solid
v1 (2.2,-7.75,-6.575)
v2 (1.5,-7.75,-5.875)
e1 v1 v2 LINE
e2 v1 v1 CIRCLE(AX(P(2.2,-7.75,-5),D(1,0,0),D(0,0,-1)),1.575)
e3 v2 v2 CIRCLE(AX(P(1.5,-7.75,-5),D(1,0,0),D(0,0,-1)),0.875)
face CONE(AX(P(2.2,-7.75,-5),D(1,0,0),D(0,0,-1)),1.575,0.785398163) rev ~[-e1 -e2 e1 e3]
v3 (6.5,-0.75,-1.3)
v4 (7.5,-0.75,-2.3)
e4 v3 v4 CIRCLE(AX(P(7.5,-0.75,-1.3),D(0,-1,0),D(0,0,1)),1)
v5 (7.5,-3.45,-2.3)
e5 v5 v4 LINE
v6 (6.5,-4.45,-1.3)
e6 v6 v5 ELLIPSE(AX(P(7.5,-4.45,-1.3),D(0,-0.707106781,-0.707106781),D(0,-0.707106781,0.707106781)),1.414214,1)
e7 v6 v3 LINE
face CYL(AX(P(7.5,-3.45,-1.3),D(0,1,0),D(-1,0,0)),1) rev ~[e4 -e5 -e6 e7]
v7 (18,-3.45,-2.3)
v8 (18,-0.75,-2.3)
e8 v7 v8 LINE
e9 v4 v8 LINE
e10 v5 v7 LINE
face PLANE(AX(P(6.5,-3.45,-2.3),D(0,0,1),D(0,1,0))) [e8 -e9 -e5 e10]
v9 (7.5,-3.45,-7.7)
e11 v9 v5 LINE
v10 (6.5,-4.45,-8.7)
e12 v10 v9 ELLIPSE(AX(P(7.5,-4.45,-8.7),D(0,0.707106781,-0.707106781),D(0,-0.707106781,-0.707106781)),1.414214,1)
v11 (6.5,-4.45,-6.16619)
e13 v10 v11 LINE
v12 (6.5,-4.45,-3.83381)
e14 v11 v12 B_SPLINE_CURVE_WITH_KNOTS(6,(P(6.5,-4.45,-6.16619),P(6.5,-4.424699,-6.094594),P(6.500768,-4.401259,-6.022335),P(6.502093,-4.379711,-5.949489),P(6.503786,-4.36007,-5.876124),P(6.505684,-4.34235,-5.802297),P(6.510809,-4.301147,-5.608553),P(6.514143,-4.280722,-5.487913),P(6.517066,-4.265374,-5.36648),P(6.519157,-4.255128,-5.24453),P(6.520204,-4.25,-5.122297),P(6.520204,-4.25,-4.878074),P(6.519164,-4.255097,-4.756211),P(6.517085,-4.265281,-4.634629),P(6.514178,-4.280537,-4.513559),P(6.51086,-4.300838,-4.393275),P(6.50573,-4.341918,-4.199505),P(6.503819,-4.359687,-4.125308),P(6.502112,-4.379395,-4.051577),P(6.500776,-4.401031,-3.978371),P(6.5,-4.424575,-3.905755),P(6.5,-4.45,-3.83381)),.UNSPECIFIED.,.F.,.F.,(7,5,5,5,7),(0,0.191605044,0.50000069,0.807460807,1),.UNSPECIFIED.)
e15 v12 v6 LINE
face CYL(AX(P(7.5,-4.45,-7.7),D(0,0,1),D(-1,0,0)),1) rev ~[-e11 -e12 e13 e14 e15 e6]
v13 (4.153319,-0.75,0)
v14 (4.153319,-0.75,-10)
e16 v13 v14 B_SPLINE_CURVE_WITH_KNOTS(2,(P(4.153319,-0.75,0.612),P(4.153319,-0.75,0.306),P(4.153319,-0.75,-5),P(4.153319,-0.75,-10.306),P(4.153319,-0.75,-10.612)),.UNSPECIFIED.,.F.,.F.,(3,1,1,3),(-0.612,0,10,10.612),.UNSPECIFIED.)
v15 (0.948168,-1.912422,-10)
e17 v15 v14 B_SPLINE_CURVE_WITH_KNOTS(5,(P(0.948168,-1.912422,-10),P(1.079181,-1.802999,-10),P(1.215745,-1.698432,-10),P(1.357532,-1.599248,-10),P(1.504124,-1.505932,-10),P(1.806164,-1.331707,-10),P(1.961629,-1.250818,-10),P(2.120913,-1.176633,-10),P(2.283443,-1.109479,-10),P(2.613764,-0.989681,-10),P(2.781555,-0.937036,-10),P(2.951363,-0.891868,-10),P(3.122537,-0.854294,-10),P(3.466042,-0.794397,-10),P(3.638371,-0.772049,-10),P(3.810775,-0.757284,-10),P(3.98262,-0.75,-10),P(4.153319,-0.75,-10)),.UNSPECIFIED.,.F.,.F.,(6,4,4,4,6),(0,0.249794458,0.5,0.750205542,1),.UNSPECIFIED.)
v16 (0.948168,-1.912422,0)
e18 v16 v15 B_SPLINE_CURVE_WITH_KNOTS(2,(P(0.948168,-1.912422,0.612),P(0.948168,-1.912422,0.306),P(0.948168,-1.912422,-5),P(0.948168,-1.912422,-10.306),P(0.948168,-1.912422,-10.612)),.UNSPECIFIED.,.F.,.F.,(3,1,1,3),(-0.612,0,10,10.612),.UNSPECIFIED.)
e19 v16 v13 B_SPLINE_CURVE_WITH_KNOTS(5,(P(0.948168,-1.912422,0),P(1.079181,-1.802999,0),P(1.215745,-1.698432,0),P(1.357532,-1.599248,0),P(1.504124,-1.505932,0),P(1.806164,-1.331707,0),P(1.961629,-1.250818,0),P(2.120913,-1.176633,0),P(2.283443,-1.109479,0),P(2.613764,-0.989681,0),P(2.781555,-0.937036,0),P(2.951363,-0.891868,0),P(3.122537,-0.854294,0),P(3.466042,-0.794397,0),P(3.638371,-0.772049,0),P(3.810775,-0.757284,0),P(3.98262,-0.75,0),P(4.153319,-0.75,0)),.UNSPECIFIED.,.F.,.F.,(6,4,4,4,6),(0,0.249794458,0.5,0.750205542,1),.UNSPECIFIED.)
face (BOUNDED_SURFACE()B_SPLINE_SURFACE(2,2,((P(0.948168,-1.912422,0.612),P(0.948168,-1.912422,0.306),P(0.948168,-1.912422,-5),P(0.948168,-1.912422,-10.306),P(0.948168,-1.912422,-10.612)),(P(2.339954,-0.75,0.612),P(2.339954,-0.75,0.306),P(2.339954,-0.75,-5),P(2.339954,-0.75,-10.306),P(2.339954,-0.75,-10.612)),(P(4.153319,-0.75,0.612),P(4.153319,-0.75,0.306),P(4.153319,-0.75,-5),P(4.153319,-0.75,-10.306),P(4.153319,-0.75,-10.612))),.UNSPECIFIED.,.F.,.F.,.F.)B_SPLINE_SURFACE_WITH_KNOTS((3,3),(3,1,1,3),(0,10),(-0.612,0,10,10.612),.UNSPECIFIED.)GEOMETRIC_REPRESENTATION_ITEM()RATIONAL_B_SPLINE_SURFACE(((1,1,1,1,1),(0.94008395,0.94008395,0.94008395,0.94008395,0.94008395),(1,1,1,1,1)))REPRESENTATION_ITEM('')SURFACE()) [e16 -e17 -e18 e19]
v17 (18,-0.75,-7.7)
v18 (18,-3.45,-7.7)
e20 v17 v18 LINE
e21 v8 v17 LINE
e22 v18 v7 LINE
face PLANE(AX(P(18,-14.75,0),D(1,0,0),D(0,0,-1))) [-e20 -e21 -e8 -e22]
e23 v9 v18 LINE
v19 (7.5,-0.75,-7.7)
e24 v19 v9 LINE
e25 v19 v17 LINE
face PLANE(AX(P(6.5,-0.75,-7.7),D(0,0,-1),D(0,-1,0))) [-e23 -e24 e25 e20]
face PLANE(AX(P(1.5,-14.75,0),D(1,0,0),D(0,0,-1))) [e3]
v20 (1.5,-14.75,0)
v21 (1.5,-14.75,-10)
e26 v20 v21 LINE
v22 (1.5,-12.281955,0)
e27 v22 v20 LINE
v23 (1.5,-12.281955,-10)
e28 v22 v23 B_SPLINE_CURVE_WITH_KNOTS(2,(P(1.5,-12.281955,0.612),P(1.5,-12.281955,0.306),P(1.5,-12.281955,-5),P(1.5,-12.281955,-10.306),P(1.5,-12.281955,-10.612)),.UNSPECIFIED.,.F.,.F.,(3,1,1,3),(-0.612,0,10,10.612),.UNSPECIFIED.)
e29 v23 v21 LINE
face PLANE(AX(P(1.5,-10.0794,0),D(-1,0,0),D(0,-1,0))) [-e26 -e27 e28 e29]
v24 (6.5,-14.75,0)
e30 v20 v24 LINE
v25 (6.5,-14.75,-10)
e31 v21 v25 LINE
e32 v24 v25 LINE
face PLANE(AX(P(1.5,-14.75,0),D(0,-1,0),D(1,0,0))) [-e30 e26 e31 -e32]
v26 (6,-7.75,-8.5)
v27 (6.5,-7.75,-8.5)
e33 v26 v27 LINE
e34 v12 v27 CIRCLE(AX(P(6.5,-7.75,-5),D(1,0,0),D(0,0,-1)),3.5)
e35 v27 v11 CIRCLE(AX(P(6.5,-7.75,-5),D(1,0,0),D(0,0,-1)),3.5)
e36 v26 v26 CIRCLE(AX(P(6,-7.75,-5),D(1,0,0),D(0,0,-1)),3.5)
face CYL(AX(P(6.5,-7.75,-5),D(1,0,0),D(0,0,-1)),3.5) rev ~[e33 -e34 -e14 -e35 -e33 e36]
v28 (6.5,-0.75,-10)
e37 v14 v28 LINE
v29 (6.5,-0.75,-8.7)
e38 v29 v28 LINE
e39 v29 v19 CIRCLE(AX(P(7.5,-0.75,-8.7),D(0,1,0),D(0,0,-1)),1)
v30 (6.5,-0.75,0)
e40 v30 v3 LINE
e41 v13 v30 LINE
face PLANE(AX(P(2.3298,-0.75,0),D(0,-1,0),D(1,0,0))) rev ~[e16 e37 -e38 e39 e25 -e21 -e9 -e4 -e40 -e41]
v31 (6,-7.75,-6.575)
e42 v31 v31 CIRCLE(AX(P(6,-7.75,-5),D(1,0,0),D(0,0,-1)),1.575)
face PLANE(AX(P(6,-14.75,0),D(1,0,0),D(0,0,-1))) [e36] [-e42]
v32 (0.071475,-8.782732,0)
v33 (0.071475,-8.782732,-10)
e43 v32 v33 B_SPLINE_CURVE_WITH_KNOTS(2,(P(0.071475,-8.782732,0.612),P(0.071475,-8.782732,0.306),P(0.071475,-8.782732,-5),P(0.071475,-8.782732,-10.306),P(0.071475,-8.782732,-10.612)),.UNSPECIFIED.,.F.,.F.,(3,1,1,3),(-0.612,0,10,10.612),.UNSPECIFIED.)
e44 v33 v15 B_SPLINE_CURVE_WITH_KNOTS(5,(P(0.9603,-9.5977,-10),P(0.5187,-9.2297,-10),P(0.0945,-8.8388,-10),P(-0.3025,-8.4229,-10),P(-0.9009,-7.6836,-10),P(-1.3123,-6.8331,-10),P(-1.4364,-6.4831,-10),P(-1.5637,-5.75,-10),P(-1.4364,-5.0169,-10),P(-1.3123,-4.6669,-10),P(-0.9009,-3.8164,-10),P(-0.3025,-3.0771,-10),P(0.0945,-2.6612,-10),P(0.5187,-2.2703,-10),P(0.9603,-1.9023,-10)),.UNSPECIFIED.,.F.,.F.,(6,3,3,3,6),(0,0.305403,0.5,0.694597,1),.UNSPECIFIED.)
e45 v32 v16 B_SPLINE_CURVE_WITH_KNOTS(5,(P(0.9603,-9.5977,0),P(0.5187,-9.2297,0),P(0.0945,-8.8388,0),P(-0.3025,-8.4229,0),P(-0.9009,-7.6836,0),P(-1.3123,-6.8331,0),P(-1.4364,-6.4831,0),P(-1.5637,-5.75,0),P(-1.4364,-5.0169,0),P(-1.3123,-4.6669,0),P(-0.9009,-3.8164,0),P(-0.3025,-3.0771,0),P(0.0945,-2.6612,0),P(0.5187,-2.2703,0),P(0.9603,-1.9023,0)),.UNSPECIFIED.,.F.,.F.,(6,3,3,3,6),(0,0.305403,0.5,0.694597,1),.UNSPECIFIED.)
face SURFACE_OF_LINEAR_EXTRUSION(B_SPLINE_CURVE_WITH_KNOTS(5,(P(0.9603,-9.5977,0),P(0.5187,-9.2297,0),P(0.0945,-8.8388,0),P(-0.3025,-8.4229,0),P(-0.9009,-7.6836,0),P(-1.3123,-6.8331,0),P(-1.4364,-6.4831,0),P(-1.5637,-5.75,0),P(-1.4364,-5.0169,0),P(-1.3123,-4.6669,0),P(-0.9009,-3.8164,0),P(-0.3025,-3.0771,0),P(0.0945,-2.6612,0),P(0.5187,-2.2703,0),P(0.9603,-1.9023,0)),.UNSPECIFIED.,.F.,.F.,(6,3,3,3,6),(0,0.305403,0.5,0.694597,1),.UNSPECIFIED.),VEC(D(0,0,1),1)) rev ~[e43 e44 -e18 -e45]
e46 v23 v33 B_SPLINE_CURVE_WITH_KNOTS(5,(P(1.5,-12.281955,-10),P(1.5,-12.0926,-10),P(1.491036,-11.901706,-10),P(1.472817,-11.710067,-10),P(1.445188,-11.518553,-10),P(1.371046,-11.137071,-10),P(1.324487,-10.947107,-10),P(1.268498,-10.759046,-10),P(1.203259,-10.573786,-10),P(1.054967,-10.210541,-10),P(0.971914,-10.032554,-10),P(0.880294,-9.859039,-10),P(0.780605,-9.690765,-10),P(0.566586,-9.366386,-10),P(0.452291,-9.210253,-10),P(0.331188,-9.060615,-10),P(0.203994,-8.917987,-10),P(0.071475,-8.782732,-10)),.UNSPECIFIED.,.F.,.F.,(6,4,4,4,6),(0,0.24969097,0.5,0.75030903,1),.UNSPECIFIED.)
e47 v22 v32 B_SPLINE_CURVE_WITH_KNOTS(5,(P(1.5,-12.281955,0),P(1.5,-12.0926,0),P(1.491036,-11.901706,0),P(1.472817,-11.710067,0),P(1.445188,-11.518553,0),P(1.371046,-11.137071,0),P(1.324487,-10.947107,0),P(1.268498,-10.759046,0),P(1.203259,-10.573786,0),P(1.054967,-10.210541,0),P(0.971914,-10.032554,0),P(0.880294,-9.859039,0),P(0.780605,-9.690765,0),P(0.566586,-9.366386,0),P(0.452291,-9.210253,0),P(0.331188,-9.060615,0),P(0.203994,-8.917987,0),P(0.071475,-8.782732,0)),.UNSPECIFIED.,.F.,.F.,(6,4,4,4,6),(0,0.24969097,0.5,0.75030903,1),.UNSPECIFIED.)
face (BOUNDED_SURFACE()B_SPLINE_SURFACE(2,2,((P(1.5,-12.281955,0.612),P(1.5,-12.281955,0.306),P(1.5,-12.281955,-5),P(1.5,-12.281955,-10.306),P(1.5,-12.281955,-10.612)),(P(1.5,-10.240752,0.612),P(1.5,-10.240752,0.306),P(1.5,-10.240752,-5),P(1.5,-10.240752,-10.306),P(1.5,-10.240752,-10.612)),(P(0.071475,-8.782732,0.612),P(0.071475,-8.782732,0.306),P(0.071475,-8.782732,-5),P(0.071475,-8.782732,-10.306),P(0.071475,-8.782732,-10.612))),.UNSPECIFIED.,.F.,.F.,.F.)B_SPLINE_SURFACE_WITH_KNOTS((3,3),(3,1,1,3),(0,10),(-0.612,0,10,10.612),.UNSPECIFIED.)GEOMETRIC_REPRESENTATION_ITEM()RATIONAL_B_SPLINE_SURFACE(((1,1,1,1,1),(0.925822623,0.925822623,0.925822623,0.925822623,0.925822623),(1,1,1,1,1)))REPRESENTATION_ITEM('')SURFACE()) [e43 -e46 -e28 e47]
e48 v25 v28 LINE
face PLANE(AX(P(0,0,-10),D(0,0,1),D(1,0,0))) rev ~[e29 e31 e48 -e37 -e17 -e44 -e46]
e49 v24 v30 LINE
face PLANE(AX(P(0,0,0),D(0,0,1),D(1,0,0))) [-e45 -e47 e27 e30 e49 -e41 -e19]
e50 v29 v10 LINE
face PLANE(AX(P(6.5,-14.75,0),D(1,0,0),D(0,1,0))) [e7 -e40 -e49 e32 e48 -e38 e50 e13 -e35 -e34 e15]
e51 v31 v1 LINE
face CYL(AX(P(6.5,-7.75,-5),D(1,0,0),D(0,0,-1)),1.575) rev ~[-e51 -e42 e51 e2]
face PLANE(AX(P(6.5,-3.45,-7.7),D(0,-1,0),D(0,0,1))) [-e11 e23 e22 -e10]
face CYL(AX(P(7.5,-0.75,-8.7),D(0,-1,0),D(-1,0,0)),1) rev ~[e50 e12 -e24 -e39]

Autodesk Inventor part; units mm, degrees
ref_plane "YZ Plane" through (0, 0, 0) normal (1, 0, 0) x (0, 1, 0)
ref_plane "XZ Plane" through (0, 0, 0) normal (0, 1, 0) x (-1, 0, 0)
ref_plane "XY Plane" through (0, 0, 0) normal (0, 0, 1) x (1, 0, 0)
sketch "Эскиз1" plane through (0, 0, 0) normal (0, 0, 1) x (1, 0, 0)
  spline S0 degree 2 poles (0, -10.75) (-6, -5.75) (0, -0.75) knots -1 -1 -1 0 0 0
  circle A0 centre (31, -8.75) radius 2.1
  circle A1 centre (0.3533, 10.75) radius 2.1
  circle A2 centre (-6.5719, -8.75) radius 2.1
  arc A3 (26, -0.75) -> (0.0249, 0.0543) centre (13, -0.75) ccw
  line L0 (26, -0.75) -> (26, -14.75)
  line L1 (26, -14.75) -> (42.8533, -14.75)
  line L2 (42.8533, -14.75) -> (25.4056, 8.5426)
  arc A4 (25.4056, 8.5426) -> (13, 14.75) centre (13, -0.75) ccw
  line L3 (13, 14.75) -> (-7.8522, 14.75)
  line L4 (-7.8522, 14.75) -> (-8.8, 13.8022)
  arc A5 (-8.8, 13.8022) -> (-9.3554, 12.7353) centre (-7.3858, 12.388) ccw
  line L5 (-9.3554, 12.7353) -> (-9.4563, 12.1627)
  line L6 (-9.4563, 12.1627) -> (-3.6467, 12.1627)
  line L7 (-3.6467, 12.1627) -> (-3.6467, 9.9627)
  line L8 (-3.6467, 9.9627) -> (-9.8443, 9.9627)
  line L9 (-9.8443, 9.9627) -> (-13.8491, -12.75)
  line L10 (-13.8491, -12.75) -> (-7.0093, -12.75)
  line L11 (-7.0093, -12.75) -> (-7.0093, -14.75)
  line L12 (-7.0093, -14.75) -> (0, -14.75)
  line L13 (0, -14.75) -> (0, -11.6512)
  line L14 (1.5, -14.75) -> (26, -14.75)
  line L15 (0.9603, -9.5977) -> (1.5, -10.0794)
  line L16 (1.5, -10.0794) -> (1.5, -14.75)
  line L17 (0.9603, -1.9023) -> (2.3298, -0.75)
  line L18 (2.3298, -0.75) -> (26, -0.75)
  spline S1 degree 3 poles (0.0249, 0.0543) (0.0092, -0.1986) (-0.0544, -0.4464) (-0.2708, -0.9048) (-0.4215, -1.1114) (-0.6069, -1.2843) knots 0 0 0 0 0.5 0.5 1 1 1 1
  spline S2 degree 3 poles (-0.6318, -10.1924) (-0.4418, -10.3706) (-0.2885, -10.5841) (-0.1211, -10.951) (-0.0759, -11.0869) (-0.0153, -11.366) (0, -11.5084) (0, -11.6512) knots 0 0 0 0 0.476947 0.476947 0.738474 0.738474 1 1 1 1
  spline S3 degree 2 poles (-0.6318, -10.1924) (-5.3806, -5.7383) (-0.6069, -1.2843) knots -0.944242 -0.944242 -0.944242 -0.053426 -0.053426 -0.053426
  line L19 (1.5, -14.75) -> (6.5, -14.75)
  line L20 (6.5, -14.75) -> (6.5, -0.75)
  spline S4 degree 5 poles (0.9603, -9.5977) (0.5187, -9.2297) (0.0945, -8.8388) (-0.3025, -8.4229) (-0.9009, -7.6836) (-1.3123, -6.8331) (-1.4364, -6.4831) (-1.5637, -5.75) (-1.4364, -5.0169) (-1.3123, -4.6669) (-0.9009, -3.8164) (-0.3025, -3.0771) (0.0945, -2.6612) (0.5187, -2.2703) (0.9603, -1.9023) knots 0 0 0 0 0 0 0.305403 0.305403 0.305403 0.5 0.5 0.5 0.694597 0.694597 0.694597 1 1 1 1 1 1
  point P0 (0, 0)
  dimension "d0" = 1.5
  dimension "d2" = 1.5
  dimension "d12" = 5
extrude "Выдавливание1" add sketch "Эскиз1" against normal blind 10 contours L20 L14 L16 L15 S4 L17 L18
fillet "Сопряжение2" radius 5 2 edges at (1.5, -10.0794, -5) (2.3298, -0.75, -5)
fillet_without_effect "Сопряжение3"
sketch "Эскиз3" plane through (6.5, -14.75, 0) normal (1, 0, 0) x (0, 0, -1)
  line L0 (0, 0) -> (0, 14) projected
  line L1 (0, 0) -> (10, 0) projected
  line L2 (10, 14) -> (10, 0) projected
  line L3 (0, 14) -> (10, 14) projected
  line L4 (0, 14) -> (10, 14) projected
  line L5 (5, 14) -> (5, 0)
  line L6 (0, 0) -> (10, 0) projected
  circle A0 centre (5, 7) radius 1.575
  point P0 (0, 14.75)
  dimension "d13" = 3.15
extrude "Выдавливание3" cut sketch "Эскиз3" against normal blind 5 contours A0 L5 | L5 A0
chamfer "Фаска1" distance 0.7 angle 45 1 edges at (1.5, -7.75, -3.425)
sketch "Эскиз4" plane through (6.5, -14.75, 0) normal (1, 0, 0) x (0, 0, -1)
  line L0 (9, 14) -> (10, 14) projected
  line L1 (10, 0) -> (10, 14) projected
  line L2 (0, 0) -> (10, 0) projected
  line L3 (0, 14) -> (0, 0) projected
  line L4 (0, 14) -> (1, 14) projected
  circle A0 centre (5, 7) radius 2.1 projected
  line L5 (7.7, 11.3) -> (2.3, 11.3)
  line L6 (2.3, 11.3) -> (2.3, 14.3)
  line L7 (2.3, 14.3) -> (-0.3, 14.3)
  line L8 (-0.3, 14.3) -> (-0.3, -0.3)
  line L9 (-0.3, -0.3) -> (10.3, -0.3)
  line L10 (10.3, -0.3) -> (10.3, 14.3)
  line L11 (10.3, 14.3) -> (7.7, 14.3)
  line L12 (7.7, 14.3) -> (7.7, 11.3)
  line L13 (0, 14) -> (10, 14) projected
  line L14 (1, 10) -> (1, 14) projected
  line L15 (9, 10) -> (1, 10) projected
  line L16 (9, 14) -> (9, 10) projected
  point P0 (0, 14.75)
  point P1 (2, 14)
  point P2 (8, 14)
  point P3 (7.7, 14)
  point P4 (2.3, 14)
extrude "Выдавливание4" add sketch "Эскиз4" along normal blind 11.5 contours L12 L5 L6 L13
fillet "Сопряжение4" radius 1 3 edges at (6.5, -2.1, -7.7) (6.5, -3.45, -5) (6.5, -2.1, -2.3)
sketch "Эскиз5" plane through (6.5, -14.75, 0) normal (1, 0, 0) x (0, 0, -1)
  circle A0 centre (5, 7) radius 1.575 projected
  line L0 (8.7, 10.3) -> (8.7, 14) projected
  line L1 (1.3, 10.3) -> (8.7, 10.3) projected
  line L2 (1.3, 14) -> (1.3, 10.3) projected
  line L3 (0, 14) -> (1.3, 14) projected
  line L4 (0, 0) -> (0, 14) projected
  line L5 (0, 0) -> (10, 0) projected
  line L6 (10, 14) -> (10, 0) projected
  line L7 (8.7, 14) -> (10, 14) projected
  circle A1 centre (5, 7) radius 1.575 projected
  circle A2 centre (5, 7) radius 3.5
  point P0 (0, 14.75)
  point P1 (3.8338, 10.3)
  point P2 (6.1662, 10.3)
  dimension "d23" = 7
extrude "Выдавливание5" cut sketch "Эскиз5" along normal mid plane 1 contours A0 | A2 L1 | L1 A2
properties part number "upor"
